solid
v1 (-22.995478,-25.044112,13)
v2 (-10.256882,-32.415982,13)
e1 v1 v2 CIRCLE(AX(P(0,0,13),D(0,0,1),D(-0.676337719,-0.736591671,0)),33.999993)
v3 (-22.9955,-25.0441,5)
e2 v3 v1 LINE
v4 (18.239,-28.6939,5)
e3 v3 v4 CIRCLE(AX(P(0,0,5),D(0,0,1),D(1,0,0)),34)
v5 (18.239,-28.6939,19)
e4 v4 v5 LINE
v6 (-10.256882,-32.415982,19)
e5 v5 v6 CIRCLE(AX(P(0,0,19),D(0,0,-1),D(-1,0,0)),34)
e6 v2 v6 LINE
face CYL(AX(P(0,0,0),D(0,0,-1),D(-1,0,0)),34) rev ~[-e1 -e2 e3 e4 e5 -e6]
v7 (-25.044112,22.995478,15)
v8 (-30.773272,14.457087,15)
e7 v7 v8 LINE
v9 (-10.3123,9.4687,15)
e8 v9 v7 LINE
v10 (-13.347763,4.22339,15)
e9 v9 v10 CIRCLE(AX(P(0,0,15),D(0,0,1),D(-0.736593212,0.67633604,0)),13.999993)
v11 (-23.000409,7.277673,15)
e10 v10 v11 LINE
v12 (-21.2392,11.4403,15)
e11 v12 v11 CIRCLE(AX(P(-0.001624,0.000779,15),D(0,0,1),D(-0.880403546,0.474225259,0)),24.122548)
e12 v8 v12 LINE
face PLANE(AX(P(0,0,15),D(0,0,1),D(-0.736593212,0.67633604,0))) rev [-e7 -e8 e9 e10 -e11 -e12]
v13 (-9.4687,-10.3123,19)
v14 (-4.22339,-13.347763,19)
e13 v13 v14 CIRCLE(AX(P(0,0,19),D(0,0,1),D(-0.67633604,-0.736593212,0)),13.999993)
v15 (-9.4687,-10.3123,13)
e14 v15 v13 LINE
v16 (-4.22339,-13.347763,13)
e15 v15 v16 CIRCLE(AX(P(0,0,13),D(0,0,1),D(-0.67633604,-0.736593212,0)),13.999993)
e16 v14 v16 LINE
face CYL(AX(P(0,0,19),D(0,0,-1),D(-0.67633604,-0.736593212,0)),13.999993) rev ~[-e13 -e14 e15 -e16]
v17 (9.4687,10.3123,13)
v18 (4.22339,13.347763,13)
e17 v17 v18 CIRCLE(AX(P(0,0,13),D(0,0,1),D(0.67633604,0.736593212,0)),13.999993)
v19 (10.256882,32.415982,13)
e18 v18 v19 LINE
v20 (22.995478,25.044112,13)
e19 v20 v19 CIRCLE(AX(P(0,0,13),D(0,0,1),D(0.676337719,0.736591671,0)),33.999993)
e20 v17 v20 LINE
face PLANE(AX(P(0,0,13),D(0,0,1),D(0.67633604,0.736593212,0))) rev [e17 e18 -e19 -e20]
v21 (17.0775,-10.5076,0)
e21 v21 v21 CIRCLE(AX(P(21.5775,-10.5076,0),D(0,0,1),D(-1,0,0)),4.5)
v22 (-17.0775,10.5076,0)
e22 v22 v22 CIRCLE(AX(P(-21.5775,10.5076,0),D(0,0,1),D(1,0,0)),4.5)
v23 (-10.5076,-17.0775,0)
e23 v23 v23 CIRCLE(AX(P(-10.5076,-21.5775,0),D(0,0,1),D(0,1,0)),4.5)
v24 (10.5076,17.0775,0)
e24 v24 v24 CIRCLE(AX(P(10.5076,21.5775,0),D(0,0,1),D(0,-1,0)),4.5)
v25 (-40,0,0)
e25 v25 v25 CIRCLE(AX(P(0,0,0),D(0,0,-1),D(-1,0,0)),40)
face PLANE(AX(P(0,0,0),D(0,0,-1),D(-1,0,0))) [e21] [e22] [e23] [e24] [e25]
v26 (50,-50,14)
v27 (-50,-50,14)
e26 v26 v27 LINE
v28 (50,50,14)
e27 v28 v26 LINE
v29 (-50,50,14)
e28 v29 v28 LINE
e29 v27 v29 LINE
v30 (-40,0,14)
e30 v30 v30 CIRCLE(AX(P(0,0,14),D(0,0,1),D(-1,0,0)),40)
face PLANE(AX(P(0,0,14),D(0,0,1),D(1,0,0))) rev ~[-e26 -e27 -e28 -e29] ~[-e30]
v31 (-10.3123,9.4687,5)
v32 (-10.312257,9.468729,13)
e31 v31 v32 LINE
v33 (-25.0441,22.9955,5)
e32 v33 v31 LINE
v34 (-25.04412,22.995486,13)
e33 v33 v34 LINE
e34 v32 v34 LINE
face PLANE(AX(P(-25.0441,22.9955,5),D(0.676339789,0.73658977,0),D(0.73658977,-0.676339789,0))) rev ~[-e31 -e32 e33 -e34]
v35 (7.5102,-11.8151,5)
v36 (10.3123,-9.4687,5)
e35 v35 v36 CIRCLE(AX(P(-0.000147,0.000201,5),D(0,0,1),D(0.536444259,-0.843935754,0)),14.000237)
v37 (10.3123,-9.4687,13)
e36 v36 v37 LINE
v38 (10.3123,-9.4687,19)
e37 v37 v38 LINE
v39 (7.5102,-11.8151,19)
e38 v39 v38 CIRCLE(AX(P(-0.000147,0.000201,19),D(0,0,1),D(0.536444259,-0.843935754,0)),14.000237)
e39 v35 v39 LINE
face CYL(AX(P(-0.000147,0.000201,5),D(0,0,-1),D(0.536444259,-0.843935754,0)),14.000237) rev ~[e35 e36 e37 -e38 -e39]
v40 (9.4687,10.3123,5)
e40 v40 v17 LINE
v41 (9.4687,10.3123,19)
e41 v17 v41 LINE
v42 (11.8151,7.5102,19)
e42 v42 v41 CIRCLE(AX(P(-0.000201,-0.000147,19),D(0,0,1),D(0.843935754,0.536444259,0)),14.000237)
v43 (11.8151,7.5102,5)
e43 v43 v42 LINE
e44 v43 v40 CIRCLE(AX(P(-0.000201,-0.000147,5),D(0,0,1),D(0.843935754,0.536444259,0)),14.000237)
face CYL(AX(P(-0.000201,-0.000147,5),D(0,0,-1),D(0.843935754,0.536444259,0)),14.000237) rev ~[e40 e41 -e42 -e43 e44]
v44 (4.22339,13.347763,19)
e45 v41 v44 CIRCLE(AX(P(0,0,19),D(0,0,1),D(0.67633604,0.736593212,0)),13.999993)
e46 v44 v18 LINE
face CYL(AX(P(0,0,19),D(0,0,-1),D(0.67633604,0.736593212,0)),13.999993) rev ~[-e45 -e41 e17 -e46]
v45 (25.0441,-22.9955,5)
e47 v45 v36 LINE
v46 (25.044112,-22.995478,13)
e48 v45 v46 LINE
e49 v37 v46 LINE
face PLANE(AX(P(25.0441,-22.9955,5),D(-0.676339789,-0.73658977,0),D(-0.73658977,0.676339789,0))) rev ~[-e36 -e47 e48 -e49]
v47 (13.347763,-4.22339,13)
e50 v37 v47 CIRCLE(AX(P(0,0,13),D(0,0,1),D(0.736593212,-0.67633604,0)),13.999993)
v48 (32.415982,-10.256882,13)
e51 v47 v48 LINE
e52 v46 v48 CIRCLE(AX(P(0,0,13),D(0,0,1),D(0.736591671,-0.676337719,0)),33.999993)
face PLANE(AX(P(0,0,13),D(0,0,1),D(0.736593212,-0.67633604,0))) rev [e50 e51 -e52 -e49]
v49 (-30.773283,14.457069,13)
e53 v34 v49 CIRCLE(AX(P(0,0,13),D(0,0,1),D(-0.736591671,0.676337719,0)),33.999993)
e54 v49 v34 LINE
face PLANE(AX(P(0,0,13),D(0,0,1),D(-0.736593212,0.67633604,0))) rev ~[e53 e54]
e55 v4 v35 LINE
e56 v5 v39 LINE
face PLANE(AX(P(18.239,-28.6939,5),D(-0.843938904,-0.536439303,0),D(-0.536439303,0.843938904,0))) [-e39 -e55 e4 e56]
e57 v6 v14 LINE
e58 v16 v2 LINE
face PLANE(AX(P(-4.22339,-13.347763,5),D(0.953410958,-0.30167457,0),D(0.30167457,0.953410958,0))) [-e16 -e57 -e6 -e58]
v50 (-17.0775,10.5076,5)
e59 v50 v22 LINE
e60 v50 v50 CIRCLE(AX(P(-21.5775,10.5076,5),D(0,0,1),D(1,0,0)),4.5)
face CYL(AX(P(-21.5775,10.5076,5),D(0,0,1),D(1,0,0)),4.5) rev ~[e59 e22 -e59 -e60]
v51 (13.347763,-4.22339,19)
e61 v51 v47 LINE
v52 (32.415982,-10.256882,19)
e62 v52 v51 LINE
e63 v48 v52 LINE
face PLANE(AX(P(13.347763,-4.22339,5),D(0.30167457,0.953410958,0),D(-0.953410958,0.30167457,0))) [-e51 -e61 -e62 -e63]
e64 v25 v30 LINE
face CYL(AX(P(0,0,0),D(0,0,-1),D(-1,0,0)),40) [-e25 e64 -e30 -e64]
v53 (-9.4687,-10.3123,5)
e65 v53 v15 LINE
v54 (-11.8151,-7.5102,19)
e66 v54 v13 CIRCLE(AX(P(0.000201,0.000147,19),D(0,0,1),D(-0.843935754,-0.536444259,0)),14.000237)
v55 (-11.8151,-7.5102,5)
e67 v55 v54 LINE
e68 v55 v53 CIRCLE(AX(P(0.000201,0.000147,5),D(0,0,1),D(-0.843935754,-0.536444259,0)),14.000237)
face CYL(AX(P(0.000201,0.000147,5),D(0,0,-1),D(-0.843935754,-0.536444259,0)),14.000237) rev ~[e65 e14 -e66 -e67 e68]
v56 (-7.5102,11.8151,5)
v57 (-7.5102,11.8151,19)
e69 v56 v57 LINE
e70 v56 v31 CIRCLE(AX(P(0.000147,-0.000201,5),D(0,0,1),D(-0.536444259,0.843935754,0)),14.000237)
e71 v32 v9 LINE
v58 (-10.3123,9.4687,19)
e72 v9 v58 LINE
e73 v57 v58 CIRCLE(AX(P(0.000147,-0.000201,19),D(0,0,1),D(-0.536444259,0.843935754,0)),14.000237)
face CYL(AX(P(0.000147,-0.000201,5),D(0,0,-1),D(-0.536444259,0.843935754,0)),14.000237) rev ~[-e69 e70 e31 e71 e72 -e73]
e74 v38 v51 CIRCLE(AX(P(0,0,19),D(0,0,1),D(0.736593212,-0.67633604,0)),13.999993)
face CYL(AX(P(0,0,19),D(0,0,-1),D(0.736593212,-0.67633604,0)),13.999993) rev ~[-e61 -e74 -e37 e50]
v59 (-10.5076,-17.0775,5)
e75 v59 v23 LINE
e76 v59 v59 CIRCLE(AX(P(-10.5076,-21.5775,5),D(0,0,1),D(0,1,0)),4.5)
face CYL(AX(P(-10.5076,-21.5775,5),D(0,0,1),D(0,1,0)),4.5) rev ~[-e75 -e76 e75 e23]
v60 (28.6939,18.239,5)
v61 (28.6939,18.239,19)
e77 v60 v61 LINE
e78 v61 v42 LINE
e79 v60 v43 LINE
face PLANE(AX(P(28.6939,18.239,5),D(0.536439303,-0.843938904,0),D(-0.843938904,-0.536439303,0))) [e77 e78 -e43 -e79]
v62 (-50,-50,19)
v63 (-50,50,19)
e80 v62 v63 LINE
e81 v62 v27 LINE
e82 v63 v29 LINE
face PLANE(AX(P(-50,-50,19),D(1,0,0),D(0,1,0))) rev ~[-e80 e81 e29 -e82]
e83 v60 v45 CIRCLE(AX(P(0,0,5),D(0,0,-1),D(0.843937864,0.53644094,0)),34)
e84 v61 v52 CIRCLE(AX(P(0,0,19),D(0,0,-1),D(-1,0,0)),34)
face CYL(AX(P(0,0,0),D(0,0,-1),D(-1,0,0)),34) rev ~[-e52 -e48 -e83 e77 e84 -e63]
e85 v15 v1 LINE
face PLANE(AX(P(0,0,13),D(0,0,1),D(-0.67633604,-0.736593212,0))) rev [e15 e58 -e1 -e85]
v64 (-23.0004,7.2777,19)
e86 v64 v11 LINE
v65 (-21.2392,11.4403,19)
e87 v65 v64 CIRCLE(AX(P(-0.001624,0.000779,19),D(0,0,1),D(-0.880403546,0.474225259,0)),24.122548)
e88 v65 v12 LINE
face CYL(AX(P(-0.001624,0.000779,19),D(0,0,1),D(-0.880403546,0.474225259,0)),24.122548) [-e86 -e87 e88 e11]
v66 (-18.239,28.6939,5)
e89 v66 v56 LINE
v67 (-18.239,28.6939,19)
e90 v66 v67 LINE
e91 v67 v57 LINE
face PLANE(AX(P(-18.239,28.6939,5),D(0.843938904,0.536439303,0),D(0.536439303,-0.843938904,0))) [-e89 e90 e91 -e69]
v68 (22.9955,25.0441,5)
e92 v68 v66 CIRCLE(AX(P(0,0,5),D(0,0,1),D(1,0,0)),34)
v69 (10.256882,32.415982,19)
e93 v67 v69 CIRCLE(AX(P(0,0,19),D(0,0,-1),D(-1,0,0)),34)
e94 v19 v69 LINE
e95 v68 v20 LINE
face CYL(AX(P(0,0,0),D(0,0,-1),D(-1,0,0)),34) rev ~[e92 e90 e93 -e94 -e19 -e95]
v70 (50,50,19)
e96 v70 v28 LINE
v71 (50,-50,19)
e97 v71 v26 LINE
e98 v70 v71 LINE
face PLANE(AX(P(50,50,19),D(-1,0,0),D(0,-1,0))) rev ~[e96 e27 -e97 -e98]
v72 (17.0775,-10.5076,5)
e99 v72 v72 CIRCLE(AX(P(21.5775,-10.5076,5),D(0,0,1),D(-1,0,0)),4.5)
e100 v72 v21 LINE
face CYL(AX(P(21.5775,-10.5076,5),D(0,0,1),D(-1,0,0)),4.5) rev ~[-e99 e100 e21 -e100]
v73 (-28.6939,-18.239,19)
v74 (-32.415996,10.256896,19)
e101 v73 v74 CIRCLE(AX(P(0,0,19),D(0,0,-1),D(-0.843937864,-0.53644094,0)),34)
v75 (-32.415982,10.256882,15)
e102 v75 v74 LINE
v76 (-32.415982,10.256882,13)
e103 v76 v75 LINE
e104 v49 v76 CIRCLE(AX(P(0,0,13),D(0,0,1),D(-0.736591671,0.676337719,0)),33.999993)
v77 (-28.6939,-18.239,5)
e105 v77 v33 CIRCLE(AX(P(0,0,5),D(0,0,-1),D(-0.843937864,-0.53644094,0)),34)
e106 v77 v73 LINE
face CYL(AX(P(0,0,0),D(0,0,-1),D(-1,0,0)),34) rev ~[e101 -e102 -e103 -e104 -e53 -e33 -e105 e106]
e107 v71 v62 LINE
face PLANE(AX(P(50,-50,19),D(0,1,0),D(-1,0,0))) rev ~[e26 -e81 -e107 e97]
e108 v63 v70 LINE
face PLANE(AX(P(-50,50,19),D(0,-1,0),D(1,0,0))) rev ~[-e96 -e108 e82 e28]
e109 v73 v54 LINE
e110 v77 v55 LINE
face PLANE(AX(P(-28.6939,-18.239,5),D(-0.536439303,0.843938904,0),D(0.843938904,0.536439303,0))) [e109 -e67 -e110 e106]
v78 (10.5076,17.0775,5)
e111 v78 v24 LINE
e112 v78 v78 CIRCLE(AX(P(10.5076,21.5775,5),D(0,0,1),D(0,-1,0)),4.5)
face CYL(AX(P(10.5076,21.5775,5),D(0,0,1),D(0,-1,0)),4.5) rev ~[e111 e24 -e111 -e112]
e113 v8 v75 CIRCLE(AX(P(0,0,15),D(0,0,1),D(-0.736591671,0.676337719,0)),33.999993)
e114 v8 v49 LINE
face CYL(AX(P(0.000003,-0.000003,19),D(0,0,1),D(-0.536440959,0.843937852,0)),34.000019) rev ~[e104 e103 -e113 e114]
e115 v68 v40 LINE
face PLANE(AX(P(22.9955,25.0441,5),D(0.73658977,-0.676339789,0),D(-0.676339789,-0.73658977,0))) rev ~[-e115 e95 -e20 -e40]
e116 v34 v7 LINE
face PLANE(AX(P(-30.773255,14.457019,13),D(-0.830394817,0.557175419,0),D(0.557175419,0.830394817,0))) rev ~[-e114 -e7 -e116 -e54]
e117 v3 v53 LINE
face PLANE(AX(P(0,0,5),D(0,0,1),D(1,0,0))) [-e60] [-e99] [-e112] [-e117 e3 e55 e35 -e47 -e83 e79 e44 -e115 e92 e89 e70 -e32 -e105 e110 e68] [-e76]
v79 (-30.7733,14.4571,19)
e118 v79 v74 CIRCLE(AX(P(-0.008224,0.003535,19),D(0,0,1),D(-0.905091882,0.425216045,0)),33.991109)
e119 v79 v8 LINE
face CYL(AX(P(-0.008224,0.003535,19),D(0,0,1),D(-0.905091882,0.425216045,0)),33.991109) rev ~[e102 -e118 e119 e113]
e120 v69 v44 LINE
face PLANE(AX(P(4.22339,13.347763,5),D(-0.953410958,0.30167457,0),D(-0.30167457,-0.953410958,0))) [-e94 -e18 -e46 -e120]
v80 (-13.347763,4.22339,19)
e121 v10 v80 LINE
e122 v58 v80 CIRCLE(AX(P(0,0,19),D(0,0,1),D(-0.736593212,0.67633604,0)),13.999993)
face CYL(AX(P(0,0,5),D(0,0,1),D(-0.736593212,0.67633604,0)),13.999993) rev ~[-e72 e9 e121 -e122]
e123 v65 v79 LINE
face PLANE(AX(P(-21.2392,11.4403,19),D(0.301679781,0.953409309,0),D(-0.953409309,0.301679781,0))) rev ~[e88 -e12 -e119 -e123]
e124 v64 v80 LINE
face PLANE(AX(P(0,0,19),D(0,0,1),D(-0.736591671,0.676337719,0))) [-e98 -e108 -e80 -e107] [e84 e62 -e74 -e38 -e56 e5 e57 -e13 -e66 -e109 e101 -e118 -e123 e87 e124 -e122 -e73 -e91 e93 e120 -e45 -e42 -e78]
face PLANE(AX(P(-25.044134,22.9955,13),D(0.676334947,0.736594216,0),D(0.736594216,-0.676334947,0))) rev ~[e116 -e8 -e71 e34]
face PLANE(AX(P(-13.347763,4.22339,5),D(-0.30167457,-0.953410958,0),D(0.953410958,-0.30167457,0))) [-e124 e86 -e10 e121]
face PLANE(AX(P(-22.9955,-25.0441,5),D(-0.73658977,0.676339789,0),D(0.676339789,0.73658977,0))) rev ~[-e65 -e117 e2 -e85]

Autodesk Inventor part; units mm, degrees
ref_plane "YZ Plane" through (0, 0, 0) normal (1, 0, 0) x (0, 1, 0)
ref_plane "XZ Plane" through (0, 0, 0) normal (0, 1, 0) x (-1, 0, 0)
ref_plane "XY Plane" through (0, 0, 0) normal (0, 0, 1) x (1, 0, 0)
sketch "Sketch5" plane through (0, 0, 0) normal (0, 0, 1) x (1, 0, 0)
  circle A0 centre (0, 0) radius 34
  dimension "d9" = 68
extrude "Extrusion4" add sketch "Sketch5" along normal blind 5
sketch "Sketch6" plane through (0, 0, 5) normal (0, 0, 1) x (1, 0, 0)
  line L0 (0, 0) -> (-25.0441, 22.9955) construction
  circle A0 centre (0, 0) radius 34 construction
  line L1 (0, 0) -> (-18.239, 28.6939) construction
  line L2 (-25.0441, 22.9955) -> (-10.3123, 9.4687)
  line L3 (-18.239, 28.6939) -> (-7.5102, 11.8151)
  arc A1 (-7.5102, 11.8151) -> (-10.3123, 9.4687) centre (0, 0) ccw
  arc A2 (-18.239, 28.6939) -> (-25.0441, 22.9955) centre (0, 0) ccw
  dimension "d12" = 15
  dimension "d14" = 20
extrude "Extrusion5" add sketch "Sketch6" along normal blind 14
sketch "Sketch7" plane through (-10.3123, 9.4687, 5) normal (-0.6763389, -0.7365906, 0) x (0.7365906, -0.6763389, 0)
  line L0 (-20, 14) -> (0, 14)
  line L1 (0, 14) -> (0, 8)
  line L2 (0, 8) -> (-20, 8)
  line L3 (-20, 8) -> (-20, 14)
  line L4 (14, -8.8) -> (14, 17.8) projected
  point P0 (14, -5)
  dimension "d17" = 6
  dimension "d18" = 20
revolve "Revolution1" add sketch "Sketch7" angle 25 about axis through (0, 0, 5) along (0, 0, 1)
sketch "Sketch8" plane through (0, 0, 5) normal (0, 0, 1) x (1, 0, 0)
  circle A0 centre (-21.5775, 10.5076) radius 4.5
  circle A1 centre (0, 0) radius 24 construction
  dimension "d25" = 48
  dimension "d21" = 9
extrude "Extrusion6" cut sketch "Sketch8" against normal up to surface (5 mm away)
pattern_circular "Circular Pattern1" count 4 over 360 about axis through (0, 0, 5) along (0, 0, 1) of "Extrusion6", "Revolution1", "Extrusion5"
sketch "Sketch9" plane through (0, 0, 0) normal (0, 0, -1) x (-1, 0, 0)
  circle A0 centre (0, 0) radius 34
  circle A1 centre (0, 0) radius 40
  dimension "d31" = 68
  dimension "d32" = 6
extrude "Extrusion7" add sketch "Sketch9" against normal blind 19
sketch "Sketch10" plane through (0, 0, 19) normal (0, 0, 1) x (1, 0, 0)
  circle A0 centre (0, 0) radius 40
  line L0 (-50, 50) -> (50, 50)
  line L1 (50, 50) -> (50, -50)
  line L2 (50, -50) -> (-50, -50)
  line L3 (-50, -50) -> (-50, 50)
  point P0 (-50, 0)
  point P1 (0, 50)
  dimension "d35" = 100
  dimension "d36" = 100
  dimension "d37" = 80
extrude "Extrusion8" add sketch "Sketch10" against normal blind 5
sketch "Sketch11" plane through (0, 0, 19) normal (0, 0, 1) x (1, 0, 0)
  line L0 (-7.5102, 11.8151) -> (-18.239, 28.6939) projected
  line L1 (-13.3478, 4.2234) -> (-32.416, 10.2569) projected
  arc A0 (-12.8746, 20.2545) -> (-22.8819, 7.2402) centre (0, 0) ccw
  arc A1 (-32.416, 10.2569) -> (-28.6939, -18.239) centre (0, 0) ccw projected
  arc A2 (-18.239, 28.6939) -> (-32.416, 10.2569) centre (0, 0) ccw
  line L2 (-30.7733, 14.4571) -> (-21.1185, 11.4021)
  dimension "d40" = 10
  dimension "d41" = 4.5
extrude "Extrusion9" cut sketch "Sketch11" against normal up to surface (6 mm away) contours A0 L1 A2 L2
sketch "Sketch14" plane through (0, 0, 13) normal (0, 0, -1) x (-0.865517, 0.5008796, 0)
  line L0 (33.1941, 7.3589) -> (13.6681, 3.0302)
  line L1 (13.6681, 3.0302) -> (13.6681, -3.0302)
  line L2 (13.6681, -3.0302) -> (23.4311, -5.1946)
  line L3 (23.4311, -5.1946) -> (13.6681, -3.0302) projected
  line L4 (23.4311, -5.1946) -> (33.876, -2.9009)
  line L5 (33.876, -2.9009) -> (33.1941, 7.3589)
  point P0 (0, 0)
extrude "Extrusion10" cut sketch "Sketch14" against normal blind 10
sketch "Sketch15" plane through (-10.3123, 9.4687, 5) normal (-0.6763389, -0.7365906, 0) x (0.7365906, -0.6763389, 0)
  line L0 (0, 0) -> (0, 14) projected
  line L1 (-20, 14) -> (0, 14)
  line L2 (0, 14) -> (0, 10)
  line L3 (0, 10) -> (-20, 10)
  line L4 (-20, 10) -> (-20, 14)
  line L5 (14, -8.8) -> (14, 17.8) projected
  point P0 (14, -5)
  dimension "d48" = 4
revolve "Revolution2" add sketch "Sketch15" angle 25 about axis through (0, 0, 5) along (0, 0, 1)
sketch "Sketch16" plane through (0, 0, 19) normal (0, 0, 1) x (1, 0, 0)
  line L0 (-32.416, 10.2569) -> (-23.0004, 7.2777)
  line L1 (-13.3478, 4.2234) -> (-32.416, 10.2569) projected
  line L2 (-21.2392, 11.4403) -> (-30.7733, 14.4571)
  arc A0 (-30.7733, 14.4571) -> (-32.416, 10.2569) centre (0, 0) ccw
  arc A1 (-21.2392, 11.4403) -> (-23.0004, 7.2777) centre (0, 0) ccw
  arc A2 (-32.416, 10.2569) -> (-28.6939, -18.239) centre (0, 0) ccw projected
  dimension "d50" = 4.5
  dimension "d51" = 10
extrude "Extrusion11" cut sketch "Sketch16" against normal blind 10
properties part number "female 4 bay con"
